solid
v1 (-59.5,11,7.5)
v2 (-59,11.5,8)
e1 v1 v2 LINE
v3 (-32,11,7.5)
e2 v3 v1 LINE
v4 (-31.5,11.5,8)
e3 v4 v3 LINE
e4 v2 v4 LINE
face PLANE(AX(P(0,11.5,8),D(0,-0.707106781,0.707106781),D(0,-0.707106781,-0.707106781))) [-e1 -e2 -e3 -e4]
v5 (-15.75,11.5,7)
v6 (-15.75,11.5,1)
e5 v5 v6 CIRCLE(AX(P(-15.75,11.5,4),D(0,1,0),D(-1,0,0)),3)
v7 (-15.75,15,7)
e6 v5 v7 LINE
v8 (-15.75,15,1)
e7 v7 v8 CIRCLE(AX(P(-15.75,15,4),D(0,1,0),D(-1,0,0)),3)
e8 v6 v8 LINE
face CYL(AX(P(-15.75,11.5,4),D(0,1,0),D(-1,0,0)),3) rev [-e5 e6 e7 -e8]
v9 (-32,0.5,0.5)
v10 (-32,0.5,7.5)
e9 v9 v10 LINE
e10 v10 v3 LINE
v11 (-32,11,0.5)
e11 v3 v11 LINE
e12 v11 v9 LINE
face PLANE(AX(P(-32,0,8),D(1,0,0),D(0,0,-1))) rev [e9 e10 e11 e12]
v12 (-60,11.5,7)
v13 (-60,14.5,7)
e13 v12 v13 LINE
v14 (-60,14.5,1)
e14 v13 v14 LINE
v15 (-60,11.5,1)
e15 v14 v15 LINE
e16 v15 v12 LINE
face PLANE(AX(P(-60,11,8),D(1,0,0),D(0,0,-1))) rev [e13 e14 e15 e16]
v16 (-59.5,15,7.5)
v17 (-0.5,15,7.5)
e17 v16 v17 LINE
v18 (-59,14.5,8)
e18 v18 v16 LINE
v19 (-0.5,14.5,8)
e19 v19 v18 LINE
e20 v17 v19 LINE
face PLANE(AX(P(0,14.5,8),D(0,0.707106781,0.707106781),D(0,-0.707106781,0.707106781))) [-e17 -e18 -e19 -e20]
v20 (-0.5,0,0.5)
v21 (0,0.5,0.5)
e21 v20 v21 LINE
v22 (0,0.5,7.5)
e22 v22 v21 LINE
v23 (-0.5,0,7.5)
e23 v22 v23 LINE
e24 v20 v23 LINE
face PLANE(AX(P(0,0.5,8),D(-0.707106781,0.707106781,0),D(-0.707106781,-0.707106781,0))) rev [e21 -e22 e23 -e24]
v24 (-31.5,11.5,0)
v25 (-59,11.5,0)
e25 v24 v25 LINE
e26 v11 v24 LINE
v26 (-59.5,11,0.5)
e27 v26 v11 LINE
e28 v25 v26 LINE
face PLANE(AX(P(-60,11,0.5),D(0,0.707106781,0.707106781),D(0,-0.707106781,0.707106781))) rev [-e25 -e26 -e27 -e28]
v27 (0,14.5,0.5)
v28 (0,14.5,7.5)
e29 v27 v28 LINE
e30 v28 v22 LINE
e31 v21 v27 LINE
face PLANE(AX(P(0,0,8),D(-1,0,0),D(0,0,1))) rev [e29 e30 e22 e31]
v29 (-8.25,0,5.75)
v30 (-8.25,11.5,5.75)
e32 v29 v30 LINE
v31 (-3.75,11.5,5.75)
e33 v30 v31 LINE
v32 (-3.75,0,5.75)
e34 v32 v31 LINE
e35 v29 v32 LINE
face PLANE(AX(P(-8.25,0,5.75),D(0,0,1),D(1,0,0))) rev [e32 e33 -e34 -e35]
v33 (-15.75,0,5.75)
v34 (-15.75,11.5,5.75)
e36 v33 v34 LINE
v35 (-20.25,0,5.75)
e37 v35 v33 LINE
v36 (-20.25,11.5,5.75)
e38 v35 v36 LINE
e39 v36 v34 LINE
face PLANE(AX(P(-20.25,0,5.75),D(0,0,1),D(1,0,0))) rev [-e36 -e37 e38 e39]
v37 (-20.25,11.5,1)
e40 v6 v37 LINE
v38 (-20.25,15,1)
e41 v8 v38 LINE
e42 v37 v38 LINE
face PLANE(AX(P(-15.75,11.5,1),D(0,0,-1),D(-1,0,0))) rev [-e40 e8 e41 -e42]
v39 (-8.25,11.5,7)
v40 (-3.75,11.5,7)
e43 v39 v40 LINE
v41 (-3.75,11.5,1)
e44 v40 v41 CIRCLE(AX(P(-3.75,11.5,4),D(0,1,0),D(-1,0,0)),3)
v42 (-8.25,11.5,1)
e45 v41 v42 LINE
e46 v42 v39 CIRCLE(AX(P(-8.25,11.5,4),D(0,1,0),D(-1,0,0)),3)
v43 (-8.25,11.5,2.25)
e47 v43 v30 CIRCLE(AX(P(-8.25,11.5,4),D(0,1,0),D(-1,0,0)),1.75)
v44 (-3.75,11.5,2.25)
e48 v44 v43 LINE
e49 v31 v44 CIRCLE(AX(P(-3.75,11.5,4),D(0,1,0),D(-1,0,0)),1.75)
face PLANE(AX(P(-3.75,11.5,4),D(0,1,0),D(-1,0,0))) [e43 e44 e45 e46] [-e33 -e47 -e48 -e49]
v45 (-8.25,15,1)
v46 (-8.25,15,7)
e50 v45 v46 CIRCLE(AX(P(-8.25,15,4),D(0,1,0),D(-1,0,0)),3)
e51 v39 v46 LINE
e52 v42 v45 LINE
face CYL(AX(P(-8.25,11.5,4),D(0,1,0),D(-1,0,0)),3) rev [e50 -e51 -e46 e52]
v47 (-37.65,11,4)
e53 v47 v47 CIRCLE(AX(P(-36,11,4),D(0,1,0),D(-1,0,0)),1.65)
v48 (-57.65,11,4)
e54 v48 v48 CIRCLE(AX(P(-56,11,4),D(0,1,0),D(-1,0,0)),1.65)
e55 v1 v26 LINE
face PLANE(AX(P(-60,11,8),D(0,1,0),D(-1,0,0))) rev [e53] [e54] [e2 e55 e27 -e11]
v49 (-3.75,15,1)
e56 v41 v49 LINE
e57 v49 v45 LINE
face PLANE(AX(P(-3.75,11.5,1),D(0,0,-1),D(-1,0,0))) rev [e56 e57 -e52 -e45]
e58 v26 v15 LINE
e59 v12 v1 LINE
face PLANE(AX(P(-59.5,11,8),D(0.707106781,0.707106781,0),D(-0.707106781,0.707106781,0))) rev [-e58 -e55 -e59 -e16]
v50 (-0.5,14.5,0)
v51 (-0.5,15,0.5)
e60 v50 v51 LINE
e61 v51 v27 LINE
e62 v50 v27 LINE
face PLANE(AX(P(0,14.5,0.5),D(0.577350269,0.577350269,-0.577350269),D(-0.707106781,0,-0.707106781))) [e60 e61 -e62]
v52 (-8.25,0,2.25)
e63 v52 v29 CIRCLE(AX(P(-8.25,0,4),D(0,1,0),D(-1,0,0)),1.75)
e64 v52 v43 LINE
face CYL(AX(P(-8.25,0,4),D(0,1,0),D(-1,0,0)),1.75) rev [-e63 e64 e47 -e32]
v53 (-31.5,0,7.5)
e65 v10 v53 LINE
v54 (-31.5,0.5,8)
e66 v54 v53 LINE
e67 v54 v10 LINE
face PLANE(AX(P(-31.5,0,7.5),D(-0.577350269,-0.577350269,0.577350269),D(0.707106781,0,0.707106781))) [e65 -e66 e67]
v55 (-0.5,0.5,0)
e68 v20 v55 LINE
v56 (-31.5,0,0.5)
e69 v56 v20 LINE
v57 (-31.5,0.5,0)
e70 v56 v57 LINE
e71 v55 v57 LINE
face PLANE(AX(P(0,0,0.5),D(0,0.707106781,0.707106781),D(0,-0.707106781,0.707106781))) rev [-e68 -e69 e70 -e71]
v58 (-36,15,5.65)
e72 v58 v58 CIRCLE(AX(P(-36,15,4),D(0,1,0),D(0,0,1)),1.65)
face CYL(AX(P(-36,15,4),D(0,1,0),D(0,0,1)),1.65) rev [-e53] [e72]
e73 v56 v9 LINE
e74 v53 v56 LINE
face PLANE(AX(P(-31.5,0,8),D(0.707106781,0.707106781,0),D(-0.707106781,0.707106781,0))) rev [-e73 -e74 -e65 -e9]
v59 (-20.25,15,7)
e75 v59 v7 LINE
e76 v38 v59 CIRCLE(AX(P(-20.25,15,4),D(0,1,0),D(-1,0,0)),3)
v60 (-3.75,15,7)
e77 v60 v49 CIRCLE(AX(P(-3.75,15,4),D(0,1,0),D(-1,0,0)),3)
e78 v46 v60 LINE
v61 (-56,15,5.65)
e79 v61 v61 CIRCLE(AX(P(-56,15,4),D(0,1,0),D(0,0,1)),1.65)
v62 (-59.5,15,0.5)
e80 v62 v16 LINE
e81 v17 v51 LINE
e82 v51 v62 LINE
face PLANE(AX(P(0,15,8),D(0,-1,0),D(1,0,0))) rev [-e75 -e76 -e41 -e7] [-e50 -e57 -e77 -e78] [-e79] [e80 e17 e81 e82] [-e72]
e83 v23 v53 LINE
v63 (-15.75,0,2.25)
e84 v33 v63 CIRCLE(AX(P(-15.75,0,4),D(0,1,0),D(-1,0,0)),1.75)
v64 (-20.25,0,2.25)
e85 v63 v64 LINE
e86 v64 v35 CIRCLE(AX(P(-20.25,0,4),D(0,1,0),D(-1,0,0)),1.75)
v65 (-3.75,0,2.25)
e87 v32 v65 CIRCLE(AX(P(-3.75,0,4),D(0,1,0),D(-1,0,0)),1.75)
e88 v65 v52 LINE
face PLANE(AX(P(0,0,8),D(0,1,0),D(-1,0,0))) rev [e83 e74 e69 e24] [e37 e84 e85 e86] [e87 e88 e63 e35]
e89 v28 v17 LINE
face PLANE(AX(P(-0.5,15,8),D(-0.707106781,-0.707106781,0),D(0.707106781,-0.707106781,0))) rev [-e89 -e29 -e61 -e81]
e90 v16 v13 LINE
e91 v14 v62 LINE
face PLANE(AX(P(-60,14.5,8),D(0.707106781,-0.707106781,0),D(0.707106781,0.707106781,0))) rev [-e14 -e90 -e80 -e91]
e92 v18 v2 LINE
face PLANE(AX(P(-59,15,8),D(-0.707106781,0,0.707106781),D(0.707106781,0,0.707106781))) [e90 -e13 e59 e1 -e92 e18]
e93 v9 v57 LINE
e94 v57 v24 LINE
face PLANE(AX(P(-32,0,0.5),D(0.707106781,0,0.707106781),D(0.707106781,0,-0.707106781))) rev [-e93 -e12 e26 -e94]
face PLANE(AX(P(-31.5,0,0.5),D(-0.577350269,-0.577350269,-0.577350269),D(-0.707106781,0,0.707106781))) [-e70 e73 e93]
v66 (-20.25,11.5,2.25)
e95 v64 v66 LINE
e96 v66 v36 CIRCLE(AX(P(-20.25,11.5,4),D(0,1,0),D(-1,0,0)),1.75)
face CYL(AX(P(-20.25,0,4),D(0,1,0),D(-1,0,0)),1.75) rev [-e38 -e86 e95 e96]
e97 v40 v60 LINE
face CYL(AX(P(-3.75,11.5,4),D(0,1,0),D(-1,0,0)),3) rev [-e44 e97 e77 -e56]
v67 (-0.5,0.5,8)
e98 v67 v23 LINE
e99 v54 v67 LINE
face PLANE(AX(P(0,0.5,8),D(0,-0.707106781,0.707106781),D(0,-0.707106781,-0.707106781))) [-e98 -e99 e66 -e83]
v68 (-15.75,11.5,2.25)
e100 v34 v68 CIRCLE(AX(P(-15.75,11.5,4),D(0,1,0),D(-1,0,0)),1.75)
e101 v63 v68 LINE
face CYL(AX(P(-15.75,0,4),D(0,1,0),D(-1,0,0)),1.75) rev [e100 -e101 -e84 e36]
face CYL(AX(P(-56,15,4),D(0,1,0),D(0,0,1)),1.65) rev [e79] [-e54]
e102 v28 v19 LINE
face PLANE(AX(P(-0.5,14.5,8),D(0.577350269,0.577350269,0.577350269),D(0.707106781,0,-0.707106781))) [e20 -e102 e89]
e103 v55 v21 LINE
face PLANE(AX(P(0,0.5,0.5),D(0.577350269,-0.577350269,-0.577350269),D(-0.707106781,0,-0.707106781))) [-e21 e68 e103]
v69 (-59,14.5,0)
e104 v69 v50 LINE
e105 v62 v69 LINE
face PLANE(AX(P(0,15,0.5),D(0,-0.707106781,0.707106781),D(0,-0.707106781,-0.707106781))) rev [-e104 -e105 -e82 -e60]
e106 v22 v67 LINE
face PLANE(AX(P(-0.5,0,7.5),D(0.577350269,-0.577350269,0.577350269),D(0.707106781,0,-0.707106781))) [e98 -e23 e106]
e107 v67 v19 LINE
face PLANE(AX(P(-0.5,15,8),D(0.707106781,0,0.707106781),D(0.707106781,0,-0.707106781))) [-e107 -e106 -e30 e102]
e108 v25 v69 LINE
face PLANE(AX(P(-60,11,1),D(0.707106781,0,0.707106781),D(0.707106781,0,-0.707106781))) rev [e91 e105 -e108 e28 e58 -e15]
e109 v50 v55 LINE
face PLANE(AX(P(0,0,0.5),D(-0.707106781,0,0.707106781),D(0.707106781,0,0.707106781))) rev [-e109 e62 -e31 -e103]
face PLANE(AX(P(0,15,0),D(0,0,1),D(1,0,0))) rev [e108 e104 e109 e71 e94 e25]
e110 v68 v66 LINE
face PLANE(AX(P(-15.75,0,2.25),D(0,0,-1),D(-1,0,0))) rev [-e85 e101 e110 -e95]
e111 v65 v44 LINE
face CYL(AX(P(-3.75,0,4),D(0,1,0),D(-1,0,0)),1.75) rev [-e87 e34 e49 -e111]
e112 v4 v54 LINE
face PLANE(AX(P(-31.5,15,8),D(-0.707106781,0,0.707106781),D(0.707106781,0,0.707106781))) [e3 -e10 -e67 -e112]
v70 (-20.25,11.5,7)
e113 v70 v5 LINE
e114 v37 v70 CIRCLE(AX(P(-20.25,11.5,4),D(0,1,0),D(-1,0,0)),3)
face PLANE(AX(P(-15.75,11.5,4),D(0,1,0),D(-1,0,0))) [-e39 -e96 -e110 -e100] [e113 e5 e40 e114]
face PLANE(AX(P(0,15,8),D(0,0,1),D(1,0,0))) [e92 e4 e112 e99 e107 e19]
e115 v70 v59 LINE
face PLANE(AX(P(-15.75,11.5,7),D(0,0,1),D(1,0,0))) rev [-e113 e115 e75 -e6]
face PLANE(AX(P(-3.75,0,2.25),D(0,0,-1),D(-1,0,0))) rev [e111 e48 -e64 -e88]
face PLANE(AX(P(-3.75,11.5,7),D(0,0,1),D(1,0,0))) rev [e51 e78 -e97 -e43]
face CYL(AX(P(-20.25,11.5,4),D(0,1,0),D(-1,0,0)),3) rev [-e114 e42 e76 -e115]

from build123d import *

# Parameters (mm, degrees)
EXTRUDE_1_DEPTH        = 8
HOLE_WIZARD_M4_1_D     = 3.3
CUT_EXTRUDE_1_DEPTH    = 3.5
CUT_EXTRUDE_2_DEPTH    = 62.613716005
PATTERN_LINEAR_1_COUNT = 2
PATTERN_LINEAR_1_PITCH = 12
CHAMFER_1_SIZE         = 1
CHAMFER_2_SIZE         = 0.5
PATTERN_LINEAR_2_COUNT = 2
PATTERN_LINEAR_2_PITCH = 20


with BuildPart() as part:
    # 草图1 → 凸台-拉伸1 (new body)
    with BuildSketch(Plane.XY):
        Polygon((0, 0), (-32, 0), (-32, 11), (-60, 11), (-60, 15), (0, 15), align=None)
    extrude(amount=EXTRUDE_1_DEPTH)

    # M4 螺纹孔1 (through all)
    with Locations(Plane(origin=(0, 15, 0), x_dir=(-1, 0, 0), z_dir=(0, 1, 0))):
        with Locations((56, 4)):
            hole_wizard_m4_1 = Hole(HOLE_WIZARD_M4_1_D / 2)

    # 草图4 → 切除-拉伸1 (cut)
    with BuildSketch(Plane(origin=(0, 15, 0), x_dir=(1, 0, 0), z_dir=(0, 1, 0))):
        with BuildLine():
            Line((-15.75, -7), (-20.25, -7))
            ThreePointArc((-20.25, -7), (-23.25, -4), (-20.25, -1))
            Line((-20.25, -1), (-15.75, -1))
            ThreePointArc((-15.75, -1), (-12.75, -4), (-15.75, -7))
        make_face()
    cut_extrude_1 = extrude(amount=-CUT_EXTRUDE_1_DEPTH, mode=Mode.SUBTRACT)

    # 草图5 → 切除-拉伸2 (cut, through all)
    with BuildSketch(Plane(origin=(0, 11.5, 0), x_dir=(1, 0, 0), z_dir=(0, 1, 0))):
        with BuildLine():
            Line((-20.25, -5.75), (-15.75, -5.75))
            ThreePointArc((-15.75, -5.75), (-14, -4), (-15.75, -2.25))
            Line((-15.75, -2.25), (-20.25, -2.25))
            ThreePointArc((-20.25, -2.25), (-22, -4), (-20.25, -5.75))
        make_face()
    cut_extrude_2 = extrude(amount=-CUT_EXTRUDE_2_DEPTH, mode=Mode.SUBTRACT)

    # 阵列(线性)1: 切除-拉伸1, 切除-拉伸2 ×2
    with Locations(*[(i * PATTERN_LINEAR_1_PITCH, 0, 0) for i in range(1, PATTERN_LINEAR_1_COUNT)]):
        add(cut_extrude_1, mode=Mode.SUBTRACT)
        add(cut_extrude_2, mode=Mode.SUBTRACT)

    # 倒角1
    chamfer_1_edges = [part.edges().sort_by_distance(p)[0] for p in [
        (-60, 13, 8),
        (-60, 13, 0),
    ]]
    chamfer(chamfer_1_edges, length=CHAMFER_1_SIZE)

    # 倒角2
    chamfer_2_edges = [part.edges().sort_by_distance(p)[0] for p in [
        (0, 0, 4),
        (-32, 5.5, 8),
        (-16, 0, 8),
        (0, 7.5, 8),
        (-32, 5.5, 0),
        (-16, 0, 0),
        (0, 7.5, 0),
        (-29.5, 15, 0),
        (0, 15, 4),
        (-29.5, 15, 8),
        (-60, 11, 4),
        (-60, 15, 4),
        (-45.5, 11, 8),
        (-32, 0, 4),
        (-45.5, 11, 0),
    ]]
    chamfer(chamfer_2_edges, length=CHAMFER_2_SIZE - 0.0001)  # a hair under: the kernel refuses the full size

    # 阵列(线性)2: M4 螺纹孔1 ×2
    with Locations(*[(i * PATTERN_LINEAR_2_PITCH, 0, 0) for i in range(1, PATTERN_LINEAR_2_COUNT)]):
        add(hole_wizard_m4_1, mode=Mode.SUBTRACT)


solid = part.part
